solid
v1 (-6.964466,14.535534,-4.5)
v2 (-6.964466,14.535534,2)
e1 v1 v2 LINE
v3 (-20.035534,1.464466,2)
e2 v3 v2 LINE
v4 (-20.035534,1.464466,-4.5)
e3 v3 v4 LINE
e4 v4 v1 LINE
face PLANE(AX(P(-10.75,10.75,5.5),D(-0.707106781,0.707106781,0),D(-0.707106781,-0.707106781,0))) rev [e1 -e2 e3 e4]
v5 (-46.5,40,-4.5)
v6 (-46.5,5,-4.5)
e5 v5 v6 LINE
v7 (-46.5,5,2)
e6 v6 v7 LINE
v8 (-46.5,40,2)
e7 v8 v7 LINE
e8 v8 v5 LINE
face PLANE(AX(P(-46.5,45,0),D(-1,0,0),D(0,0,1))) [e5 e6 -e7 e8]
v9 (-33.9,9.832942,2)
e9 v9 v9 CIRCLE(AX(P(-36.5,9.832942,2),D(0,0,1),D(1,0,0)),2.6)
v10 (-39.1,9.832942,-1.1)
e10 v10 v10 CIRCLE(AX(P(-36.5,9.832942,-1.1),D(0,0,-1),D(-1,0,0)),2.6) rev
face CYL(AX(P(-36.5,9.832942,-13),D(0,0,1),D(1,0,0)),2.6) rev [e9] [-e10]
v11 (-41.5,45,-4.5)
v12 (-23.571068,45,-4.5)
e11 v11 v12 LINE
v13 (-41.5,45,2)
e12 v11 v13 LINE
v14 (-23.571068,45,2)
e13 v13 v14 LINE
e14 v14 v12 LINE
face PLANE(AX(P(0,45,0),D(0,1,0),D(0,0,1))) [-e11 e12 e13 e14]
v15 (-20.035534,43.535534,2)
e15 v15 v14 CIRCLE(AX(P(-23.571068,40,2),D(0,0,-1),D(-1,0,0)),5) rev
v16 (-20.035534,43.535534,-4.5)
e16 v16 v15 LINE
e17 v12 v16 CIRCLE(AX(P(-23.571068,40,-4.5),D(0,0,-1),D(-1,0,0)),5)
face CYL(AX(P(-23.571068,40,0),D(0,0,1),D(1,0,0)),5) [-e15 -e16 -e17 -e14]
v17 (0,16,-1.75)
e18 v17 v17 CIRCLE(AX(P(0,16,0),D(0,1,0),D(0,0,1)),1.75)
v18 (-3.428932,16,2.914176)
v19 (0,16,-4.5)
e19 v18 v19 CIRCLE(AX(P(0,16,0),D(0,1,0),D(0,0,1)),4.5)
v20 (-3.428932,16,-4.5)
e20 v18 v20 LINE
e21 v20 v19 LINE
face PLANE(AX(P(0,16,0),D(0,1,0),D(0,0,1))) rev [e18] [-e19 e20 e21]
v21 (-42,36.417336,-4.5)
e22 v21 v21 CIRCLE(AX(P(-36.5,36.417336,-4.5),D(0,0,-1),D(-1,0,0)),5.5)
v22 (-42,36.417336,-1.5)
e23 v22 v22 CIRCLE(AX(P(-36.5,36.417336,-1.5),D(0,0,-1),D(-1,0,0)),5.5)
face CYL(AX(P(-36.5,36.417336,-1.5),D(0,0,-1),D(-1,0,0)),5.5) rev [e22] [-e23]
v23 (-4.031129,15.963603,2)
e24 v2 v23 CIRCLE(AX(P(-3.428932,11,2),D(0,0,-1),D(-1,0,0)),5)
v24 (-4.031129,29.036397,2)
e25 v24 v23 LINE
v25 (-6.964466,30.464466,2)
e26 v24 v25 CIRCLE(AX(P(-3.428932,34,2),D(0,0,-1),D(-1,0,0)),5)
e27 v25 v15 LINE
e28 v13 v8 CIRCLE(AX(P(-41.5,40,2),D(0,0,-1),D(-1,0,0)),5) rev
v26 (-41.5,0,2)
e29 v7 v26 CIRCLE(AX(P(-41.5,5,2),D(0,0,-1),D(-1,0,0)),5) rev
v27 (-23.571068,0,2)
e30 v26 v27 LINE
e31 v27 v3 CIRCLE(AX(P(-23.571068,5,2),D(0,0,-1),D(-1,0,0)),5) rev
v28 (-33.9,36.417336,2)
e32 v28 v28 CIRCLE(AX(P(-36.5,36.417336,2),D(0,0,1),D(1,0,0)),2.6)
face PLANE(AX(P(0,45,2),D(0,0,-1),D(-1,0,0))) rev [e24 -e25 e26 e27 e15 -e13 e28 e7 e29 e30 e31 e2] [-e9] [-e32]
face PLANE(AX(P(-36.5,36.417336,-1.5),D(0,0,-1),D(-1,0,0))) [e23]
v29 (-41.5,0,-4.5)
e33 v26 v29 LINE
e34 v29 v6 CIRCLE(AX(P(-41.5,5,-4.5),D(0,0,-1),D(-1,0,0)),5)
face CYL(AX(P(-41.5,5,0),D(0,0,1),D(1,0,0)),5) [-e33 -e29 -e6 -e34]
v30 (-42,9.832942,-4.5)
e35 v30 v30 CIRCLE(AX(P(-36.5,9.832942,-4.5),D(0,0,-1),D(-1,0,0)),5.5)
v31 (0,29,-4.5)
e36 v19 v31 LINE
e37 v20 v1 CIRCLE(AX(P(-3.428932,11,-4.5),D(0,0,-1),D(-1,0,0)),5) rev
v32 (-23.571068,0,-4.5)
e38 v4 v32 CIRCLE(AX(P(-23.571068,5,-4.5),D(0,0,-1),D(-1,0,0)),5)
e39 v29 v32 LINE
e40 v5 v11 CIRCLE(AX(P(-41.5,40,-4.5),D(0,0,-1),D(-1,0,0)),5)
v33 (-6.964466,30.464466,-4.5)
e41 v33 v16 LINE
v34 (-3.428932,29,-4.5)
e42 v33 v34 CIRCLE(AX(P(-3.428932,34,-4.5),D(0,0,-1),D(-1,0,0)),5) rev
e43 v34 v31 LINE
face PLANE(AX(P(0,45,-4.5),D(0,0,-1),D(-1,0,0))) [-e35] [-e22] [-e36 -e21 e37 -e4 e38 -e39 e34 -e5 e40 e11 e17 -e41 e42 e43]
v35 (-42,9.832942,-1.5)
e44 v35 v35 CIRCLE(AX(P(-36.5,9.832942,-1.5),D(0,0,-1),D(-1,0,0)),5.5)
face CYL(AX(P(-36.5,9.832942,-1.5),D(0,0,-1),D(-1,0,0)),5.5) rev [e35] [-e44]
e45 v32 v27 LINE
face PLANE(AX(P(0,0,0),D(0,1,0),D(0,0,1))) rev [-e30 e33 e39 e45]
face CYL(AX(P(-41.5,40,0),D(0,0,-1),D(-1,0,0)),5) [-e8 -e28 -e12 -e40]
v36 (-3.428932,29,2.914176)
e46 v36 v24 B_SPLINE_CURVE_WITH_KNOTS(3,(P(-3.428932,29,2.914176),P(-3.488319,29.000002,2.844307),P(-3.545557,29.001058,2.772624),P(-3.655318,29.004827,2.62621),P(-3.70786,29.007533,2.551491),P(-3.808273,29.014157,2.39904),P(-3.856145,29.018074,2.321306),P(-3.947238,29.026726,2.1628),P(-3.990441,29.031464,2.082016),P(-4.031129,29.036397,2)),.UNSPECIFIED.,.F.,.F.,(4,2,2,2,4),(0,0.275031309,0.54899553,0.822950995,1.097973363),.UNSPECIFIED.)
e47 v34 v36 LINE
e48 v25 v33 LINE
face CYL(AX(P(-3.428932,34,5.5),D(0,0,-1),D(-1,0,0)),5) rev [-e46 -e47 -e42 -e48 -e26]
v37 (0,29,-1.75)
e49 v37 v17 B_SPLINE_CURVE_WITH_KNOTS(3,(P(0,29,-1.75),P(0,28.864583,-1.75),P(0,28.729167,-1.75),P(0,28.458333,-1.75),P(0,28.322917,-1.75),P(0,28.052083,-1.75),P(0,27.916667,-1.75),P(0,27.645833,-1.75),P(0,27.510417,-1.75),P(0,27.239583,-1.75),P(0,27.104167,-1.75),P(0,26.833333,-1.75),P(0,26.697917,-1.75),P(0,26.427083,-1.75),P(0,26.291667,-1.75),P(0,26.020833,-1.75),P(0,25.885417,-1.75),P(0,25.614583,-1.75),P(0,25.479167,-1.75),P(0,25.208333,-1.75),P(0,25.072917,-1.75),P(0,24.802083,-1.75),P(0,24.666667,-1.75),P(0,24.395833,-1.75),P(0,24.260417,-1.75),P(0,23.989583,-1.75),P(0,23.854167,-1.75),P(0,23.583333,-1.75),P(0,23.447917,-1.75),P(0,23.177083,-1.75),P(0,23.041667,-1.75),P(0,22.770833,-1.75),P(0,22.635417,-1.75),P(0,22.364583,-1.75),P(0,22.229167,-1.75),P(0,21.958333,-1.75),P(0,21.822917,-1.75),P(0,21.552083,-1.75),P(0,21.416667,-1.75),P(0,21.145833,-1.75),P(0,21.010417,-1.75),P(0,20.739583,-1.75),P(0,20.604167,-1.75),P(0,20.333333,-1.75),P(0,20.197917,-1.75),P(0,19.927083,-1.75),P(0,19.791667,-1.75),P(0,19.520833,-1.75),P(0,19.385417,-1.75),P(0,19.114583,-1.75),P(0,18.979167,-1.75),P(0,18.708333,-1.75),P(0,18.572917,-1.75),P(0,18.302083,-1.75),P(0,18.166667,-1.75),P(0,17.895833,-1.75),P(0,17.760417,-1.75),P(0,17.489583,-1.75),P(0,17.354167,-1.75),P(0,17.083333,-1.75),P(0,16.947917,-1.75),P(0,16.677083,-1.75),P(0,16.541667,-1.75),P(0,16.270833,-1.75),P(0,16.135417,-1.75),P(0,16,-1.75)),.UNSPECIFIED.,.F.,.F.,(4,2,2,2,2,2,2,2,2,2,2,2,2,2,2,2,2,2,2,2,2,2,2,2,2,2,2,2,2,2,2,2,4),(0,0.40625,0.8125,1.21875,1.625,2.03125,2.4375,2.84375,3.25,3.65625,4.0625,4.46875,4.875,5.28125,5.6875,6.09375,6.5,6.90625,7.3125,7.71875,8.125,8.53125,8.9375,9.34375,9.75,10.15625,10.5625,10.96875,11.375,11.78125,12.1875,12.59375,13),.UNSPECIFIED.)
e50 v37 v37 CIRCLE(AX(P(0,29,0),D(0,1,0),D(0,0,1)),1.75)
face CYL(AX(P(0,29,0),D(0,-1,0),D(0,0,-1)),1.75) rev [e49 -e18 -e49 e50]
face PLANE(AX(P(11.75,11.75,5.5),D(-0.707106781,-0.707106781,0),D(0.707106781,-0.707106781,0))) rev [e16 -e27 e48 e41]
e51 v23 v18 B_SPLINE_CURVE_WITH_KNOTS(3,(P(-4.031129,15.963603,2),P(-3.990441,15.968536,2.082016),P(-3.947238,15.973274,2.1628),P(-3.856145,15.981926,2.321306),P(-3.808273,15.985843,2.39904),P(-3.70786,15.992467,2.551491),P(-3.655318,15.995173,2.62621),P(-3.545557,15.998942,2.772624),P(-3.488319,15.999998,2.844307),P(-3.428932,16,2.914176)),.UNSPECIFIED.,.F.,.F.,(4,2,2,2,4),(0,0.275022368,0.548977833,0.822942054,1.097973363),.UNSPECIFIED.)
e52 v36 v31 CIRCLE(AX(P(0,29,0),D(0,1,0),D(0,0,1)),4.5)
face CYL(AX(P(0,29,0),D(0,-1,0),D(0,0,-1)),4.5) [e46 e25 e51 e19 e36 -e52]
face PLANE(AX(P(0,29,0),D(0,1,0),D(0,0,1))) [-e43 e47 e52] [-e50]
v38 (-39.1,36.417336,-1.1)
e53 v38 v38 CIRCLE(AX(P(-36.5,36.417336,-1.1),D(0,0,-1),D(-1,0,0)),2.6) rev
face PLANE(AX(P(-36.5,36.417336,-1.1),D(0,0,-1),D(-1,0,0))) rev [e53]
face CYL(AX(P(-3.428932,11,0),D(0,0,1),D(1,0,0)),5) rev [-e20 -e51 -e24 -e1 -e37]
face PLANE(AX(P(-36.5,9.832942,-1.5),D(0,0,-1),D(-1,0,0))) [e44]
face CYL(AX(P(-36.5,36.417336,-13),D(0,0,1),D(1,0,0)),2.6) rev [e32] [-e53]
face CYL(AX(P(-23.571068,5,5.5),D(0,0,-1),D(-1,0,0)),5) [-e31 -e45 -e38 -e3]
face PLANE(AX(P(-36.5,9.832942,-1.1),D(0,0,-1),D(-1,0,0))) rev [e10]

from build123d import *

# Parameters (mm, degrees)
BOSS_EXTRUDE1_DEPTH = 45
BOSS_EXTRUDE2_START = 16
SKETCH1_3_R         = 4.5
SKETCH1_3_R_2       = 1.75
BOSS_EXTRUDE2_DEPTH = 13
CUT_EXTRUDE1_START  = 16
SKETCH5_R           = 5.5
CUT_EXTRUDE1_DEPTH  = 25
SKETCH6_R           = 2.6
CUT_EXTRUDE2_DEPTH  = 15
CUT_EXTRUDE4_START  = 49.4
SKETCH5_4_R         = 5.5
CUT_EXTRUDE4_DEPTH  = 20.4
FILLET1_R           = 0.5
FILLET2_R           = 5
SKETCH7_R           = 5.5
CUT_EXTRUDE3_DEPTH  = 3
SKETCH8_R           = 3.001117943
SKETCH8_R_2         = 3.734433125
BOSS_EXTRUDE5_DEPTH = 0.4
SKETCH9_W           = 2.236067978
SKETCH9_H           = 16
CUT_EXTRUDE5_DEPTH  = 10
FILLET4_R           = 5


with BuildPart() as part:
    # Sketch1 → Boss-Extrude1 (new body)
    with BuildSketch(Plane(origin=(0, 0, 0), x_dir=(1, 0, 0), z_dir=(0, 1, 0))):
        with BuildLine():
            Line((-46.5, 4.5), (-46.5, -2))
            Line((-46.5, -2), (-4.031128874, -2))
            ThreePointArc((-4.031128874, -2), (-3.824264635, 2.371708245), (0, 4.5))
            Line((0, 4.5), (-46.5, 4.5))
        make_face()
    extrude(amount=BOSS_EXTRUDE1_DEPTH)

    # Sketch1<3> → Boss-Extrude2 (add)
    # profile 1 of 2: a face of its own
    with BuildSketch(Plane(origin=(0, 0, 0), x_dir=(1, 0, 0), z_dir=(0, 1, 0)).offset(BOSS_EXTRUDE2_START)):
        Circle(SKETCH1_3_R)
        Polygon((-2.857883832, -1.65), (0, -3.3), (2.857883832, -1.65), (2.857883832, 1.65), (0, 3.3), (-2.857883832, 1.65), align=None, mode=Mode.SUBTRACT)
    # profile 2 of 2: a face of its own
    with BuildSketch(Plane(origin=(0, 0, 0), x_dir=(1, 0, 0), z_dir=(0, 1, 0)).offset(BOSS_EXTRUDE2_START)):
        Polygon((-2.857883832, 1.65), (-2.857883832, -1.65), (0, -3.3), (2.857883832, -1.65), (2.857883832, 1.65), (0, 3.3), align=None)
        with Locations(Location((0, 0, 0), (0, 0, 90))):
            Circle(SKETCH1_3_R_2, mode=Mode.SUBTRACT)
    extrude(amount=BOSS_EXTRUDE2_DEPTH)

    # Sketch5 → Cut-Extrude1 (cut)
    with BuildSketch(Plane(origin=(0, 0, 0), x_dir=(1, 0, 0), z_dir=(0, 1, 0)).offset(CUT_EXTRUDE1_START)):
        Circle(SKETCH5_R)
    extrude(amount=-CUT_EXTRUDE1_DEPTH, mode=Mode.SUBTRACT)

    # Sketch6 → Cut-Extrude2 (cut)
    with BuildSketch(Plane.XY.offset(2)):
        with Locations((-36.5, 36.417335992)):
            Circle(SKETCH6_R)
        with Locations((-36.5, 9.832941716)):
            Circle(SKETCH6_R)
    extrude(amount=-CUT_EXTRUDE2_DEPTH, mode=Mode.SUBTRACT)

    # Sketch5<4> → Cut-Extrude4 (cut)
    with BuildSketch(Plane(origin=(0, 0, 0), x_dir=(1, 0, 0), z_dir=(0, 1, 0)).offset(CUT_EXTRUDE4_START)):
        Circle(SKETCH5_4_R)
    extrude(amount=-CUT_EXTRUDE4_DEPTH, mode=Mode.SUBTRACT)

    # Fillet1
    fillet1_edges = [part.edges().sort_by_distance(p)[0] for p in [
        (-3.16227766, 8, -4.5),
    ]]
    fillet(fillet1_edges, radius=FILLET1_R)

    # Fillet2
    fillet2_edges = [part.edges().sort_by_distance(p)[0] for p in [
        (-46.5, 45, -1.25),
        (-46.5, 0, -1.25),
    ]]
    fillet(fillet2_edges, radius=FILLET2_R)

    # Sketch7 → Cut-Extrude3 (cut)
    with BuildSketch(Plane(origin=(0, 0, -4.5), x_dir=(-1, 0, 0), z_dir=(0, 0, -1))):
        with Locations((36.5, 36.417335992)):
            Circle(SKETCH7_R)
        with Locations((36.5, 9.832941716)):
            Circle(SKETCH7_R)
    extrude(amount=-CUT_EXTRUDE3_DEPTH, mode=Mode.SUBTRACT)

    # Sketch8 → Boss-Extrude5 (add)
    with BuildSketch(Plane(origin=(0, 0, -1.5), x_dir=(-1, 0, 0), z_dir=(0, 0, -1))):
        with Locations((36.5, 36.417335992)):
            Circle(SKETCH8_R)
        with Locations((36.5, 9.832941716)):
            Circle(SKETCH8_R_2)
    extrude(amount=-BOSS_EXTRUDE5_DEPTH)

    # Sketch9 → Cut-Extrude5 (cut)
    with BuildSketch(Plane(origin=(0, 0, -4.5), x_dir=(-1, 0, 0), z_dir=(0, 0, -1))):
        Polygon((5.5, 16), (4.472135955, 16), (4.472135955, 0), (21.5, 0), align=None)
        with Locations((3.354101966, 8)):
            Rectangle(SKETCH9_W, SKETCH9_H)
        Polygon((3.16227766, 29), (3.16227766, 45), (-0.050353192, 45), (-0.050353192, 29), (0, 29), align=None)
        Polygon((5.5, 29), (21.5, 45), (3.16227766, 45), (3.16227766, 29), align=None)
    extrude(amount=-CUT_EXTRUDE5_DEPTH, mode=Mode.SUBTRACT)

    # Fillet4
    # the kernel refuses this fillet: 5 mm, written as the material it adds along each edge
    with BuildSketch(Plane(origin=(-5.5, 29, 7.17766953), x_dir=(-0.7071067811865427, 0.7071067811865525, 0), z_dir=(0, 0, -1))) as fillet4_piece_1_section:
        with BuildLine():
            CenterArc((FILLET4_R * 0.414213562373, FILLET4_R), FILLET4_R, 225, 45)
            Line((-FILLET4_R * 0.292893218813, FILLET4_R * 0.292893218813), (0, 0))
            Line((0, 0), (FILLET4_R * 0.414213562373, 0))
        make_face()
    fillet4_piece_1 = extrude(amount=16.855339059, mode=Mode.PRIVATE)
    fillet4_piece_1 = fillet4_piece_1 & Plane(origin=(0, 29.007513744, 0), x_dir=(1, 0, 0), z_dir=(0, -1, 0)) * Cylinder(4.5, 42, mode=Mode.PRIVATE)
    add(fillet4_piece_1)
    with BuildSketch(Plane(origin=(-5.5, 29, 2), x_dir=(-0.7071067811865431, 0.7071067811865518, 0), z_dir=(0, 0, -1)), Plane(origin=(-5.5, 16, 2), x_dir=(1, 0, 0), z_dir=(0, 0, -1))) as fillet4_piece_2:
        with BuildLine():
            CenterArc((FILLET4_R * 0.414213562373, FILLET4_R), FILLET4_R, 225, 45)
            Line((-FILLET4_R * 0.292893218813, FILLET4_R * 0.292893218813), (0, 0))
            Line((0, 0), (FILLET4_R * 0.414213562373, 0))
        make_face()
    extrude(amount=6.5)
    with BuildSketch(Plane(origin=(-5.5, 16, 7.17766953), x_dir=(1, 0, 0), z_dir=(0, 0, -1))) as fillet4_piece_3_section:
        with BuildLine():
            CenterArc((FILLET4_R * 0.414213562373, FILLET4_R), FILLET4_R, 225, 45)
            Line((-FILLET4_R * 0.292893218813, FILLET4_R * 0.292893218813), (0, 0))
            Line((0, 0), (FILLET4_R * 0.414213562373, 0))
        make_face()
    fillet4_piece_3 = extrude(amount=16.855339059, mode=Mode.PRIVATE)
    fillet4_piece_3 = fillet4_piece_3 & Plane(origin=(0, 15.992486256, 0), x_dir=(1, 0, 0), z_dir=(0, -1, 0)) * Cylinder(4.5, 42, mode=Mode.PRIVATE)
    add(fillet4_piece_3)
    # the kernel refuses this fillet: 5 mm, written as the material it takes off along each edge
    with BuildSketch(Plane(origin=(-21.5, 0, -9.67766953), x_dir=(0.7071067811865441, 0.7071067811865509, 0), z_dir=(0, 0, 1)), Plane(origin=(-21.5, 45, -9.67766953), x_dir=(-1, 0, 0), z_dir=(0, 0, 1))) as fillet4_2_piece_1:
        with BuildLine():
            CenterArc((FILLET4_R * 0.414213562373, FILLET4_R), FILLET4_R, 225, 45)
            Line((-FILLET4_R * 0.292893218813, FILLET4_R * 0.292893218813), (0, 0))
            Line((0, 0), (FILLET4_R * 0.414213562373, 0))
        make_face()
    extrude(amount=16.855339059, mode=Mode.SUBTRACT)


solid = part.part
